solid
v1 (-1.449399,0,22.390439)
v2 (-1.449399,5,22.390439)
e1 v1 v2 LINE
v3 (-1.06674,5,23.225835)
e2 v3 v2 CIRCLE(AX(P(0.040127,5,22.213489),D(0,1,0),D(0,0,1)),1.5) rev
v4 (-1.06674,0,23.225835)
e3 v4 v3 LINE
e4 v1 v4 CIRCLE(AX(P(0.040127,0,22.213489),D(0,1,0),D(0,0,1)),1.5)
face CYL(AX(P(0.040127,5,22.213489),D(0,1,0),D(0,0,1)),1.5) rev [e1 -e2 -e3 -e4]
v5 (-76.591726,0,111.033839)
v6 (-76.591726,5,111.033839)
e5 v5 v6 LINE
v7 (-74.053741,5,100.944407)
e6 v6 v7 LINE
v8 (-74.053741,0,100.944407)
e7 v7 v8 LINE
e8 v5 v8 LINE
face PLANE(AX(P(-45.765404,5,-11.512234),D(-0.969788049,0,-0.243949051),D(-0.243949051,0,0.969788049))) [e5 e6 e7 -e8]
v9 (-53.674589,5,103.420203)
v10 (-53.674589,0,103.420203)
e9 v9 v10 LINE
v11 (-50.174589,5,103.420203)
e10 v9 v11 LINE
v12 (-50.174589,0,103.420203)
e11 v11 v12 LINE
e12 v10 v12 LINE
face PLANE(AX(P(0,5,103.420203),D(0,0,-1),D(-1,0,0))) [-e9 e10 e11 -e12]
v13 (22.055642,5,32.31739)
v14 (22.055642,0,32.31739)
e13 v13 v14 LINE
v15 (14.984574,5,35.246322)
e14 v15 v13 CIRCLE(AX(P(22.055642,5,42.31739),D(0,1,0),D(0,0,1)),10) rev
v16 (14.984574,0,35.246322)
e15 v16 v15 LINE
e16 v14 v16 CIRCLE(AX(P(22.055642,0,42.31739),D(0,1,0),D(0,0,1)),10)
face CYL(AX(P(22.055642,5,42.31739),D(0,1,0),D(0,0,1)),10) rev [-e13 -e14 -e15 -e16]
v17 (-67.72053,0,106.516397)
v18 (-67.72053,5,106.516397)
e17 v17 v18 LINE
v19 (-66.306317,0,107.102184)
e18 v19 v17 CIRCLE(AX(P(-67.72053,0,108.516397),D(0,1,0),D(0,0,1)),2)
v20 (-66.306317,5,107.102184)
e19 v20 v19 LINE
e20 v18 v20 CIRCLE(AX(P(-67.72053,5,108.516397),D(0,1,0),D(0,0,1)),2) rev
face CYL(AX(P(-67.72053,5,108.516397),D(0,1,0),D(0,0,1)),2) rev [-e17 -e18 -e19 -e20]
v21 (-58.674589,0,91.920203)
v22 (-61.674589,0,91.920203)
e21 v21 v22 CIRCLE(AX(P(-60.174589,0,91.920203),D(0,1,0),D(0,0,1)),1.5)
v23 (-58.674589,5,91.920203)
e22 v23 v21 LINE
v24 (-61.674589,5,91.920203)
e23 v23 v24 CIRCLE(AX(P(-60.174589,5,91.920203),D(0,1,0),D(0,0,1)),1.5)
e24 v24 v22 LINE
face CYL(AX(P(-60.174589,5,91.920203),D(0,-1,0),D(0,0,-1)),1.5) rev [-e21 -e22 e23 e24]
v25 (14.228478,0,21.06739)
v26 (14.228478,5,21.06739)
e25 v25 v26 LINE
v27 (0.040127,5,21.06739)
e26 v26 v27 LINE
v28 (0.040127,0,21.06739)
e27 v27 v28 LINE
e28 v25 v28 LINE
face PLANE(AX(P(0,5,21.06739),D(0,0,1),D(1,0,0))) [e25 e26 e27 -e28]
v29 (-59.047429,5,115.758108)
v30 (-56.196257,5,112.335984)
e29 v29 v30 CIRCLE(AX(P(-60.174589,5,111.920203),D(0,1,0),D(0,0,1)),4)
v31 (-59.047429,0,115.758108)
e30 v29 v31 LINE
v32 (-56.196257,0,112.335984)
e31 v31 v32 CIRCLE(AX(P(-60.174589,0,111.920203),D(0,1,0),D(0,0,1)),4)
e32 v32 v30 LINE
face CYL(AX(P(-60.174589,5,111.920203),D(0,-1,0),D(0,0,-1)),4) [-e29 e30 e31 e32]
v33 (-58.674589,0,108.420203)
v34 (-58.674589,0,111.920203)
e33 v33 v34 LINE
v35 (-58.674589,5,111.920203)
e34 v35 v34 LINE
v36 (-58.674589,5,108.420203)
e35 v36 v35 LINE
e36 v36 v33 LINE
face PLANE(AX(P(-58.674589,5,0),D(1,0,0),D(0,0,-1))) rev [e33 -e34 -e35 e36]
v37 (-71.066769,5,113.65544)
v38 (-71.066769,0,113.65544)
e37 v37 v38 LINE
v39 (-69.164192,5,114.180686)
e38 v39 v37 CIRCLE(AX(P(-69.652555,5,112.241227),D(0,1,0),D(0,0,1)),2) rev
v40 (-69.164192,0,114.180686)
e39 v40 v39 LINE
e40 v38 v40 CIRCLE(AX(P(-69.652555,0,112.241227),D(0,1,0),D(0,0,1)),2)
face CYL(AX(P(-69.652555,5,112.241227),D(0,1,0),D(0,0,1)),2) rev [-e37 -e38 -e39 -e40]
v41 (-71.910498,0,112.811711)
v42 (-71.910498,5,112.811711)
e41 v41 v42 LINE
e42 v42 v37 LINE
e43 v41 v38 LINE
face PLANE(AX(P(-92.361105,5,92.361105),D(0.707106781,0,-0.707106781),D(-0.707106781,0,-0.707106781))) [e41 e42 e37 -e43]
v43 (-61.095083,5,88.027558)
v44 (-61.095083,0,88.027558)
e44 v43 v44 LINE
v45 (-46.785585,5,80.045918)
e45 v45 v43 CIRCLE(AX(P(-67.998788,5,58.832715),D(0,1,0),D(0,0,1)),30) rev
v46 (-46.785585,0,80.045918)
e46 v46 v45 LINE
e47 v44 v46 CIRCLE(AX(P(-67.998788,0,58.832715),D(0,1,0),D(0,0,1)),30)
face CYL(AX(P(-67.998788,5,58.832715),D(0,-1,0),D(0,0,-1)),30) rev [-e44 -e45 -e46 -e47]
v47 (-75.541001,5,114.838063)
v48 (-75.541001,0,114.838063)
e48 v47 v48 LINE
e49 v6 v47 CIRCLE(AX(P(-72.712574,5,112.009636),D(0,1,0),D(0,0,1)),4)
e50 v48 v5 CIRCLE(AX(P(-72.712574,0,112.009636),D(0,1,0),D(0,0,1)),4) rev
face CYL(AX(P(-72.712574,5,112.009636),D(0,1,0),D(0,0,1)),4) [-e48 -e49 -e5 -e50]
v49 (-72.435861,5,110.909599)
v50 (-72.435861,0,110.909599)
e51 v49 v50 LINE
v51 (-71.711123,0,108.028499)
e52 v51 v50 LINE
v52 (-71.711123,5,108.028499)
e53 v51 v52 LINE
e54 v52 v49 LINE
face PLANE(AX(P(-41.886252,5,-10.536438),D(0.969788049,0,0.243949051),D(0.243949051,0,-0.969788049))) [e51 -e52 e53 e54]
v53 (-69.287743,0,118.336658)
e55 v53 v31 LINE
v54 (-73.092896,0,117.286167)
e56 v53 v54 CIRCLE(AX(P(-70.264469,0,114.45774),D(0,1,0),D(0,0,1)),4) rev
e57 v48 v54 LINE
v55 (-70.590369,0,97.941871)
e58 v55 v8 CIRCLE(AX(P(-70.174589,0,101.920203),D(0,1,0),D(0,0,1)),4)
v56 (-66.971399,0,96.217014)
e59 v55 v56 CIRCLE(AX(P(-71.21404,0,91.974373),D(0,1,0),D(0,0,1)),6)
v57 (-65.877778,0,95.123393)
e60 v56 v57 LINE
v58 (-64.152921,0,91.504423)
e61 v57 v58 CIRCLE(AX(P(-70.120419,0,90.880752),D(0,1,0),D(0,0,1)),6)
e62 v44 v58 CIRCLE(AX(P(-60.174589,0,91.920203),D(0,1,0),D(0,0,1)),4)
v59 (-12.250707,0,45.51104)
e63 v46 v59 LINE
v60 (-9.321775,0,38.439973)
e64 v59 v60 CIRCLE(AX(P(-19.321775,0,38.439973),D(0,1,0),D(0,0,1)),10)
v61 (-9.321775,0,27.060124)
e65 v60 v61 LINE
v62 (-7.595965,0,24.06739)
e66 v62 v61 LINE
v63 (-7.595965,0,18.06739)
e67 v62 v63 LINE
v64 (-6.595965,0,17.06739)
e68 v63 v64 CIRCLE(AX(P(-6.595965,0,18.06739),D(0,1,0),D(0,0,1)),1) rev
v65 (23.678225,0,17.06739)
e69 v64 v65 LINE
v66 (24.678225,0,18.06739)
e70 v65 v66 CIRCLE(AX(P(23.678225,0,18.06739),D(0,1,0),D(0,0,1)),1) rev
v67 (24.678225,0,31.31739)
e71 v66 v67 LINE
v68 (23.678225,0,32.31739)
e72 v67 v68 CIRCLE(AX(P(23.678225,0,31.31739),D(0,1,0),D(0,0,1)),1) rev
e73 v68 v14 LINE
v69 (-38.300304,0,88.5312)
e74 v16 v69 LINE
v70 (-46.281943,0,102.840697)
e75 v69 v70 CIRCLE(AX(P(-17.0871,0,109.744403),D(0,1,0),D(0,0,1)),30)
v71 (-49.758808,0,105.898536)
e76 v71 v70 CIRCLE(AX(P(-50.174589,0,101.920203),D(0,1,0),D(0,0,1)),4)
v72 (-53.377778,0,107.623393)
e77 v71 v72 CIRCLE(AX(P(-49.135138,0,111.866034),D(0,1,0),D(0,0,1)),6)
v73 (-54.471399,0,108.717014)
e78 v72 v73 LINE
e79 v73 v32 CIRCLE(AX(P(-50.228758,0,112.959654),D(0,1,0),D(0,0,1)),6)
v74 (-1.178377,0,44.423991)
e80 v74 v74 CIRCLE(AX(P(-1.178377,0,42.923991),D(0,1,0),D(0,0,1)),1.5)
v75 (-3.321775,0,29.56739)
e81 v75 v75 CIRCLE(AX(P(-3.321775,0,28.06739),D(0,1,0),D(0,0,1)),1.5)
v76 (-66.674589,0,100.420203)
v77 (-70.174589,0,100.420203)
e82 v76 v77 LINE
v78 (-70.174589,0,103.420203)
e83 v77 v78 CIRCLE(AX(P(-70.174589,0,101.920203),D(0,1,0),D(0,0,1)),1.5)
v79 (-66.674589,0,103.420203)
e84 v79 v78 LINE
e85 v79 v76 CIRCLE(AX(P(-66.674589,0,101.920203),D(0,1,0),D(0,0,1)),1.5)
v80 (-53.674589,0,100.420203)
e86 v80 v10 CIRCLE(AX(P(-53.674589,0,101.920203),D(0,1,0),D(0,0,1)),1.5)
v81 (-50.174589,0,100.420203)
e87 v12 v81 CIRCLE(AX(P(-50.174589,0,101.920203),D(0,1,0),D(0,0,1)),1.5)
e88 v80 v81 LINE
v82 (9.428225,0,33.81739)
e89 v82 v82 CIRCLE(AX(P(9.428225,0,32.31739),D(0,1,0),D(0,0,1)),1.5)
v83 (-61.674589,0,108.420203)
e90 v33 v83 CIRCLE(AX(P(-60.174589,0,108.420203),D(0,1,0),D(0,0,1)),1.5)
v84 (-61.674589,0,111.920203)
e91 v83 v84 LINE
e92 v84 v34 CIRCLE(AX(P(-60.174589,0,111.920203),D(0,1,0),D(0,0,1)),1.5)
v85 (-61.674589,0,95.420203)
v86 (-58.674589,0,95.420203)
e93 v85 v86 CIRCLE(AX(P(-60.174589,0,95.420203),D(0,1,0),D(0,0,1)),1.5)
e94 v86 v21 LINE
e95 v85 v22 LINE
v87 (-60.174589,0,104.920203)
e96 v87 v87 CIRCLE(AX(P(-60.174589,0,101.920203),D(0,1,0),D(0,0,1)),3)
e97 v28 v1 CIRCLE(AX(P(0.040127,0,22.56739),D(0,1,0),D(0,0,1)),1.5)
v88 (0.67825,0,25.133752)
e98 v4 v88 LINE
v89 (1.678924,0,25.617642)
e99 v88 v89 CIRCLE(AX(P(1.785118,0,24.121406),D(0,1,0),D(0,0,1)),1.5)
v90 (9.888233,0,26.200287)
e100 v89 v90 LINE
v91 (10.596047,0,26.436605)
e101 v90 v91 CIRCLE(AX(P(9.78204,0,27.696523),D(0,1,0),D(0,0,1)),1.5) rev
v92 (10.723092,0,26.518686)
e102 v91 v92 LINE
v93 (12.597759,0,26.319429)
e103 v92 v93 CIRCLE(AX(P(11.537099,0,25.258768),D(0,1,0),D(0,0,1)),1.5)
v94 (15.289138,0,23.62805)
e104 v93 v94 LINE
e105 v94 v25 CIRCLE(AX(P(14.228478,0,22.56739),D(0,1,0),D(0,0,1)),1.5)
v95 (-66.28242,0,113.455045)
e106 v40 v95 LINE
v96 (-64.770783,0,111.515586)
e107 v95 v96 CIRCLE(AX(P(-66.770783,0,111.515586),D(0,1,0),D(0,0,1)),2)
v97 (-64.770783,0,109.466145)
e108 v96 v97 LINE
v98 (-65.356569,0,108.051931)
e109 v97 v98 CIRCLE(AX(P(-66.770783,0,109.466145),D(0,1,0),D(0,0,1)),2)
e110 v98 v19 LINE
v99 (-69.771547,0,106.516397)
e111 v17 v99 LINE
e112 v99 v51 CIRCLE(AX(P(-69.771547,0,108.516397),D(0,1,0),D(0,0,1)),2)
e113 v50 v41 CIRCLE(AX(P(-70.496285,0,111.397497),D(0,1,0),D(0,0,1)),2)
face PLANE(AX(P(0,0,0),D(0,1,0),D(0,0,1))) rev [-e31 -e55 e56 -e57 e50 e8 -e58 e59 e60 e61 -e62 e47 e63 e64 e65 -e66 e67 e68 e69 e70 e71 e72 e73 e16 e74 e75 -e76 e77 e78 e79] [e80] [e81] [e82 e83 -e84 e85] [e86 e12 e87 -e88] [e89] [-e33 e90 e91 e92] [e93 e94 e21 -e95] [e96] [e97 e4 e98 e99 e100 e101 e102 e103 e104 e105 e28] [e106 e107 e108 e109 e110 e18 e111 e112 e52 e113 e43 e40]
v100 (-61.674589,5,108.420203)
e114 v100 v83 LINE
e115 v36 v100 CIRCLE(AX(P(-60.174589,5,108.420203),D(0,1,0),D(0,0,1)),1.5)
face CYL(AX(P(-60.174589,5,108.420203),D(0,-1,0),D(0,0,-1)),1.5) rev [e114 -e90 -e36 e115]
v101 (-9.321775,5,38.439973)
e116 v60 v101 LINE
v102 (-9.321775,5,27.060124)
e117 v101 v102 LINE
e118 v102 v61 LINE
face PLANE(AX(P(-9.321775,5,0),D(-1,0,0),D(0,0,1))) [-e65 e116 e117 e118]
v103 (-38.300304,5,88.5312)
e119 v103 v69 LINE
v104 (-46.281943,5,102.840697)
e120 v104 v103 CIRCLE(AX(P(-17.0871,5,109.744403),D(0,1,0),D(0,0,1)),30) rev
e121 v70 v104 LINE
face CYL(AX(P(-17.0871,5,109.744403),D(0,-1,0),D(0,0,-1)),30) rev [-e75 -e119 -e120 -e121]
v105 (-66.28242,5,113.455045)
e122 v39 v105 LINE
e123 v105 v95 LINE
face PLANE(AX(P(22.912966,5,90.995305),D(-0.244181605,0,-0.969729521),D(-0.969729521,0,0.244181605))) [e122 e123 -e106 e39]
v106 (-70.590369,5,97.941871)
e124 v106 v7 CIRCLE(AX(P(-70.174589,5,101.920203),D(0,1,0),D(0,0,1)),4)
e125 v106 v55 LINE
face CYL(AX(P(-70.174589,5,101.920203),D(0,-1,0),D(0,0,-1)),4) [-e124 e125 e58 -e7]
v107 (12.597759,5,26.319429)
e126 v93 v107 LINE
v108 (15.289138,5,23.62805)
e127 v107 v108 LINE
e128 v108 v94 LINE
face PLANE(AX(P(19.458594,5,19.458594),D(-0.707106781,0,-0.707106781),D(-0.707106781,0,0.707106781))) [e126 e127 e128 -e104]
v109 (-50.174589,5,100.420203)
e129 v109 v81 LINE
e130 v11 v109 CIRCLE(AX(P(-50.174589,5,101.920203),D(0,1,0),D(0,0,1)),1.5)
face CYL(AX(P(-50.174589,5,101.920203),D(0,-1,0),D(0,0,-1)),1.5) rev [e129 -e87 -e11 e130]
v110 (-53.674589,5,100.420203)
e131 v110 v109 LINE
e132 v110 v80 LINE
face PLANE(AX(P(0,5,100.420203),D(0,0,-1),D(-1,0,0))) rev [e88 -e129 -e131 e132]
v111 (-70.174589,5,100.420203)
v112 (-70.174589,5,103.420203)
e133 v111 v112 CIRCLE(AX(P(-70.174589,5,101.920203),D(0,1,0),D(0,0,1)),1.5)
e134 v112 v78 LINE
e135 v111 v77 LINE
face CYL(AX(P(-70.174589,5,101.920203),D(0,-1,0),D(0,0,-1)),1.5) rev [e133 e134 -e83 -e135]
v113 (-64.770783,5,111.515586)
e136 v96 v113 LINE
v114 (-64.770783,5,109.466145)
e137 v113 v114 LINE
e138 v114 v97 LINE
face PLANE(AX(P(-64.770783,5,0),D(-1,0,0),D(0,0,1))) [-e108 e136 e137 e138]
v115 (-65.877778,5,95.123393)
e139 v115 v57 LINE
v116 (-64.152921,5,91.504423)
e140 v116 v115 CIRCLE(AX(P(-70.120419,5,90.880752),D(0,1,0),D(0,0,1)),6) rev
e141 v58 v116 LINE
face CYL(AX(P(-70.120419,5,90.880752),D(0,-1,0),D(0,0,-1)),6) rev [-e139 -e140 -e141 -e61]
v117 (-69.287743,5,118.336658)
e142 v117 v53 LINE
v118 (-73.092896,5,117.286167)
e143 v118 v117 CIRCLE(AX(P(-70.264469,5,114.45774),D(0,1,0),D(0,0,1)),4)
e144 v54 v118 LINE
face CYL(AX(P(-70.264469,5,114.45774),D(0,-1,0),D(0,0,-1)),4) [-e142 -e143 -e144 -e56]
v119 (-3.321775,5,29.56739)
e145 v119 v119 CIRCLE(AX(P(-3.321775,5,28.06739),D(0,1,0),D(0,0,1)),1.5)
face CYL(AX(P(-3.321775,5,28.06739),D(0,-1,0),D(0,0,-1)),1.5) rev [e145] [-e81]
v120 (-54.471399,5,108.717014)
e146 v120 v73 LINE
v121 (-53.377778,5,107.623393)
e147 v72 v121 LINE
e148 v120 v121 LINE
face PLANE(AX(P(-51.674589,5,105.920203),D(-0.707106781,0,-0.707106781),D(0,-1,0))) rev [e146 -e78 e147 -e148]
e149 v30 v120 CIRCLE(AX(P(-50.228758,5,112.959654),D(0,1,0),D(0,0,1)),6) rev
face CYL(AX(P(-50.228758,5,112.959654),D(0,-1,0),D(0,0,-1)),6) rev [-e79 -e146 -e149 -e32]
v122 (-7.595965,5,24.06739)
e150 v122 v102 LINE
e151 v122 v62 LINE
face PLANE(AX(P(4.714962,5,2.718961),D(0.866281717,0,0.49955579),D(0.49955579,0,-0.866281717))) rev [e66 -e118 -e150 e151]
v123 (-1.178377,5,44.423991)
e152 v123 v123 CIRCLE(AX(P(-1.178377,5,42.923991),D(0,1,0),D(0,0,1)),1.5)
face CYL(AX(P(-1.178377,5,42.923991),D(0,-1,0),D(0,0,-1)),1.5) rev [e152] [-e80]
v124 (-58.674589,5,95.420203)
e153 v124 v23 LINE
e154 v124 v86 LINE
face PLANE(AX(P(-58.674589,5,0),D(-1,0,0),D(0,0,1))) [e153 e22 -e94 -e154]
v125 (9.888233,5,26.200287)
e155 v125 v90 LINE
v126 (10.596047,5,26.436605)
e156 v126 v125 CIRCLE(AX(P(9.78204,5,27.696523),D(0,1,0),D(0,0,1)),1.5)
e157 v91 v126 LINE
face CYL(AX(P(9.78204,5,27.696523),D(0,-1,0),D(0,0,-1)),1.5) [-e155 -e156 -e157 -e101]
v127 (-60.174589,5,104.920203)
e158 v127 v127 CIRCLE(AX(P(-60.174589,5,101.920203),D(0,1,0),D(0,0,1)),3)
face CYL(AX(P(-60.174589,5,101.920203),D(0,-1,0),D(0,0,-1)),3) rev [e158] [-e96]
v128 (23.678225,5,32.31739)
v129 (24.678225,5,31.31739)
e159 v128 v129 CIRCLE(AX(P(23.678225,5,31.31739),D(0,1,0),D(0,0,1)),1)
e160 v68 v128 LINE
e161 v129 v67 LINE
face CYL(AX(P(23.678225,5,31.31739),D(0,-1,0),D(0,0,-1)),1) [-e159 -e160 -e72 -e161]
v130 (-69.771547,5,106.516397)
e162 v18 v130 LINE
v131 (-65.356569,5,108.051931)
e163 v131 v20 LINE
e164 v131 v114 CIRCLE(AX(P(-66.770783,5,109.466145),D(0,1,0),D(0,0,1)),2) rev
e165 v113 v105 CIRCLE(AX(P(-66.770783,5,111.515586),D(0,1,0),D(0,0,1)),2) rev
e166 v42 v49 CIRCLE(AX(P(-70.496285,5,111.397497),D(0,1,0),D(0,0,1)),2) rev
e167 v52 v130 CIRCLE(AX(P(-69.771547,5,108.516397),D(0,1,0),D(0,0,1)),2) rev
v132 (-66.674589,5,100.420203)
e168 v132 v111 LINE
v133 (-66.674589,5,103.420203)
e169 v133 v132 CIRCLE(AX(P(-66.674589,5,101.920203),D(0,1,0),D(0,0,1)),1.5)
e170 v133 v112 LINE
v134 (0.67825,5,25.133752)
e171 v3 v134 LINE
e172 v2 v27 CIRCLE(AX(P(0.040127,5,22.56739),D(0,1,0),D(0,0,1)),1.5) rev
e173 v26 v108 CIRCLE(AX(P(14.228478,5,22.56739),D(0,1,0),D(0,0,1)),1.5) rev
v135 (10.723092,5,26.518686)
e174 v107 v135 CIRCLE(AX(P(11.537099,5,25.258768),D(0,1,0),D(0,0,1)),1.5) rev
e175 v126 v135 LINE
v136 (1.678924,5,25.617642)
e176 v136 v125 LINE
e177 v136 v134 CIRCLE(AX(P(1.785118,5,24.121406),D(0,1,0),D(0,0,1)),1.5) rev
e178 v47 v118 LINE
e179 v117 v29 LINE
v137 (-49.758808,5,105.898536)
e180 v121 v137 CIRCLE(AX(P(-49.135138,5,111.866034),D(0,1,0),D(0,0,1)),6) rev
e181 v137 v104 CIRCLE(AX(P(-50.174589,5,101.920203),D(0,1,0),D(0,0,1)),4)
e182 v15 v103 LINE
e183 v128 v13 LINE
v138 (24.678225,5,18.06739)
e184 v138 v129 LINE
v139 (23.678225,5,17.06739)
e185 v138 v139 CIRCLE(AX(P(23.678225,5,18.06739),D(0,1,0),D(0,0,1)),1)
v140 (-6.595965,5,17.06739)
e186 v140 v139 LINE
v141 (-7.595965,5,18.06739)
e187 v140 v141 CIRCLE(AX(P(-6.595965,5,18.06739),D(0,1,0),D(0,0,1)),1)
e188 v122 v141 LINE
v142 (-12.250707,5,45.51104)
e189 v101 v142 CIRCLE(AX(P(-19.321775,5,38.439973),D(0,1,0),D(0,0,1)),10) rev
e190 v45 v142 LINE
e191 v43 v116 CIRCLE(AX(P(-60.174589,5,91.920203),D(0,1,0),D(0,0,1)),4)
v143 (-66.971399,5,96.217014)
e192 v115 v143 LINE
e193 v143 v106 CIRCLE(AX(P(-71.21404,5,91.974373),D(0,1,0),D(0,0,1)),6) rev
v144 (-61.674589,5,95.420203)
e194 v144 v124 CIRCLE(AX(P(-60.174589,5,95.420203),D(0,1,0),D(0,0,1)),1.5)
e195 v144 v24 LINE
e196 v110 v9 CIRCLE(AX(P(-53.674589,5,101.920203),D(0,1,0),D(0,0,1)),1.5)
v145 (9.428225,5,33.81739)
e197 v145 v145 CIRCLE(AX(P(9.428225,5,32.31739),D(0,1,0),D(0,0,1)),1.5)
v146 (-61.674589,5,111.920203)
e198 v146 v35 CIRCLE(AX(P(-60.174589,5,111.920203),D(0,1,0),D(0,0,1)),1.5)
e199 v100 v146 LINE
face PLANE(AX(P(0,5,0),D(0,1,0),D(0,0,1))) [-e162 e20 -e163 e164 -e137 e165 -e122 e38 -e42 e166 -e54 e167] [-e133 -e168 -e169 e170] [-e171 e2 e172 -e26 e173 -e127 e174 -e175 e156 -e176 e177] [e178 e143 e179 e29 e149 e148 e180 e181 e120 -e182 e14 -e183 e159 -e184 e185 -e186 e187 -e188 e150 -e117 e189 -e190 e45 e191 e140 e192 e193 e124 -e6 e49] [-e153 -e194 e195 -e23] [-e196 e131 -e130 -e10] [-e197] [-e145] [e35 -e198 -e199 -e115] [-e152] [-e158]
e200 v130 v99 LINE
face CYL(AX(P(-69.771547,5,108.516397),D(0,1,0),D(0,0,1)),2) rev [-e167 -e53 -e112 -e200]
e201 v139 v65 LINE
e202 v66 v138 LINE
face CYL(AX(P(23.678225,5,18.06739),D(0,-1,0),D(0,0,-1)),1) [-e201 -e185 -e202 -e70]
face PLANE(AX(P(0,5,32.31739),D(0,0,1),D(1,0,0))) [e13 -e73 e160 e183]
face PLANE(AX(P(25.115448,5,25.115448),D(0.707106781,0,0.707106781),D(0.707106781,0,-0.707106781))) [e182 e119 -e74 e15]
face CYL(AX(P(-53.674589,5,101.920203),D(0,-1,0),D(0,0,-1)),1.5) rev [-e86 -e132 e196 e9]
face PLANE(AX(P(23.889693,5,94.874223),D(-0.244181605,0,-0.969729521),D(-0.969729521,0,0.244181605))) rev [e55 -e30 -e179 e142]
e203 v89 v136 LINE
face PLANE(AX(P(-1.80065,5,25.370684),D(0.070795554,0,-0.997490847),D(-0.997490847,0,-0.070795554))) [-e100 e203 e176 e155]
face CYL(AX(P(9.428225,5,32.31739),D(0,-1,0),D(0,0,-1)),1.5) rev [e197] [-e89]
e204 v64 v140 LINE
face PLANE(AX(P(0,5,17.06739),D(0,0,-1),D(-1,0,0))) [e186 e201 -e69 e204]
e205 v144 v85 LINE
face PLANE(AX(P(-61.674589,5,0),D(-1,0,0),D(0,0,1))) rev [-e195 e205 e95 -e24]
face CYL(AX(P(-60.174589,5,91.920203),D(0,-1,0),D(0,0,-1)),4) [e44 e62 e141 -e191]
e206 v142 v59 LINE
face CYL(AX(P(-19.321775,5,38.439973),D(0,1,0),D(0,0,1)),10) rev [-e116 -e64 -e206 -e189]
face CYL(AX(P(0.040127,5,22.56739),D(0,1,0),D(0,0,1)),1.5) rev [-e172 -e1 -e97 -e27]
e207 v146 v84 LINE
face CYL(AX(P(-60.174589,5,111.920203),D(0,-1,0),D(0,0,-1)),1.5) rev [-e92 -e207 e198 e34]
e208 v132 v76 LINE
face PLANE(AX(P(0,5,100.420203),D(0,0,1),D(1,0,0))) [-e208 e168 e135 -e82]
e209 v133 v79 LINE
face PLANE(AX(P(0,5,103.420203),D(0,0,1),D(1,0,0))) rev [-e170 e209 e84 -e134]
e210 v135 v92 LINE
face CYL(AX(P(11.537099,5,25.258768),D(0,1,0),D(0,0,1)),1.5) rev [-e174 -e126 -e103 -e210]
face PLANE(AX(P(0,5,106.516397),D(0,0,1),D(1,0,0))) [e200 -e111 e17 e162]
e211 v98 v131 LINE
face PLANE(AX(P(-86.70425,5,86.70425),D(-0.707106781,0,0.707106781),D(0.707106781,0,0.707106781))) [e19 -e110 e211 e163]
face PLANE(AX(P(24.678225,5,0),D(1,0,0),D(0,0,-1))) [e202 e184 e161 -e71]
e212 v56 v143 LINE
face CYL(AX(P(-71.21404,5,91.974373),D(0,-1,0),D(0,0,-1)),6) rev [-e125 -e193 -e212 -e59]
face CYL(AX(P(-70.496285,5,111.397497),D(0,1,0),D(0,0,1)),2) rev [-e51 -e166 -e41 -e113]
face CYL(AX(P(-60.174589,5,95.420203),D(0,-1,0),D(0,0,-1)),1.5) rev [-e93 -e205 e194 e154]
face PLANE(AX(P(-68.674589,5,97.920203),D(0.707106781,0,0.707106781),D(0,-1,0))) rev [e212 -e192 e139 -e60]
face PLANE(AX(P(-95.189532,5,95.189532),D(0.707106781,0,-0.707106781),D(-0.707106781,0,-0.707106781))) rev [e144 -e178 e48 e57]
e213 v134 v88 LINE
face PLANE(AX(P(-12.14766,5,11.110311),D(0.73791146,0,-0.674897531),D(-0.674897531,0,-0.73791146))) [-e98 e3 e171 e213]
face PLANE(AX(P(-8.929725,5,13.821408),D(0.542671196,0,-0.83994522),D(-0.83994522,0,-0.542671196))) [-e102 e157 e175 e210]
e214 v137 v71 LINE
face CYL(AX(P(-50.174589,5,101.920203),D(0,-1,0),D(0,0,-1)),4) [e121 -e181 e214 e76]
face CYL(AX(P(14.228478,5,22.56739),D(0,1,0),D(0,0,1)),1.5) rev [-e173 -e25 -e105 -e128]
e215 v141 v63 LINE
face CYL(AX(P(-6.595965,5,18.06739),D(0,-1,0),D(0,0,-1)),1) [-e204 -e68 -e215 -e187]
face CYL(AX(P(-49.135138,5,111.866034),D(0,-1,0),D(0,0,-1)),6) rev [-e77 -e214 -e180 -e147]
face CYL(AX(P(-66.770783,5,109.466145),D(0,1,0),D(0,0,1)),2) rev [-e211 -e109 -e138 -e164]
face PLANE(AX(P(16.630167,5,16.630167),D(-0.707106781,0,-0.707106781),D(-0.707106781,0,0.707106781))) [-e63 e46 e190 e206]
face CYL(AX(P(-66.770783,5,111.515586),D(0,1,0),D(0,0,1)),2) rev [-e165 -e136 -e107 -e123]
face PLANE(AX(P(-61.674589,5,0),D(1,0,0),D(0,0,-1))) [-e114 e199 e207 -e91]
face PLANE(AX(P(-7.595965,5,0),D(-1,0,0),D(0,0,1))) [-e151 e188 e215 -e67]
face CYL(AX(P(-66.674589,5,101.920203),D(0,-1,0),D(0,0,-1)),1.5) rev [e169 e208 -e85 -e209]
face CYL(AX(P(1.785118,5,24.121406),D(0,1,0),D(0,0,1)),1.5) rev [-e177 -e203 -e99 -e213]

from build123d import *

# Parameters (mm, degrees)
SKETCH2_R           = 3.0000000000000018
SKETCH2_R_2         = 1.4999999999993736
SKETCH2_R_3         = 1.5000000000000009
SKETCH2_R_4         = 1.4999999999993723
BOSS_EXTRUDE1_DEPTH = 5
FILLET1_R           = 1.5
FILLET3_R           = 10
FILLET5_R           = 10
CHAMFER1_SIZE       = 4.5
FILLET6_R           = 6
FILLET7_R           = 4
FILLET8_R           = 2
FILLET9_R           = 30
FILLET10_R          = 1


with BuildPart() as part:
    # Sketch2 → Boss-Extrude1 (new body)
    with BuildSketch(Plane(origin=(0, 0, 0), x_dir=(1, 0, 0), z_dir=(0, 1, 0))):
        with BuildLine():
            Line((-46.189355852298796, -96.42025186017804), (-39.496927389393186, -89.72782339727232))
            Line((-39.496927389393186, -89.72782339727232), (17.913506363615255, -32.31738964426288))
            Line((17.913506363615255, -32.31738964426288), (24.678224989376695, -32.31738964426288))
            Line((24.678224989376695, -32.31738964426288), (24.678224989376428, -17.06738964426295))
            Line((24.678224989376428, -17.06738964426295), (-7.595965049770856, -17.06738964426337))
            Line((-7.595965049770856, -17.06738964426337), (-7.595965049770857, -24.067389644263372))
            Line((-7.595965049770857, -24.067389644263372), (-9.321775010623746, -27.06012368042446))
            Line((-9.321775010623746, -27.06012368042446), (-9.32177501062375, -37.06738964426337))
            Line((-9.32177501062375, -37.06738964426337), (-9.321775010623757, -42.58210827002507))
            Line((-9.321775010623753, -42.58210827002507), (-54.6598701272448, -87.9202033866469))
            Line((-54.6598701272448, -87.9202033866469), (-60.17458875300816, -87.92020338664692))
            ThreePointArc((-60.17458875300816, -87.92020338664692), (-63.00301587775435, -89.09177626190073), (-64.17458875300817, -91.92020338664692))
            Line((-64.17458875300817, -91.92020338664692), (-64.17458875300817, -97.92020338664689))
            Line((-64.17458875300817, -97.92020338664689), (-70.17458875301077, -97.92020338664689))
            ThreePointArc((-70.17458875301077, -97.92020338664689), (-72.6339398041774, -98.76558892412923), (-74.05374095021992, -100.9444071830841))
            Line((-74.05374095021992, -100.9444071830841), (-77.14515150148509, -113.23391188563446))
            Line((-77.14515150148509, -113.23391188563446), (-71.4882972519927, -118.89076613512684))
            Line((-71.4882972519927, -118.89076613512684), (-59.047429208957894, -115.75810794021132))
            ThreePointArc((-59.047429208957894, -115.75810794021132), (-56.9723521770992, -114.3172183869977), (-56.174588753010745, -111.92020338664949))
            Line((-56.174588753010745, -111.92020338664949), (-56.174588753010745, -105.92020338664949))
            Line((-56.174588753010745, -105.92020338664949), (-50.174588753008145, -105.92020338664949))
            ThreePointArc((-50.174588753008145, -105.92020338664949), (-47.34616162826196, -104.74863051139567), (-46.174588753008145, -101.92020338664949))
            Line((-46.174588753008145, -101.92020338664949), (-46.17464642427909, -101.89872393503671))
            Line((-46.17464642427909, -101.89872393503671), (-46.189355852298796, -96.42025186017804))
        make_face()
        Polygon((-70.26446914062754, -114.4577399969996), (-72.71257361922765, -112.00963551839949), (-71.33075600396296, -106.51639746436214), (-66.89210317428027, -106.51639746436214), (-64.77078283072062, -108.63771780792177), (-64.7707828307206, -113.0744087552009), align=None, mode=Mode.SUBTRACT)
        with BuildLine():
            ThreePointArc((-61.67458875301074, -108.42020338664949), (-60.17458875301075, -106.92020338664949), (-58.67458875301077, -108.42020338664949))
            Line((-58.67458875301077, -108.42020338664949), (-58.674588753010774, -111.92020338664949))
            ThreePointArc((-58.674588753010774, -111.92020338664949), (-60.17458875301075, -113.42020338664946), (-61.67458875301073, -111.92020338664949))
            Line((-61.67458875301073, -111.92020338664949), (-61.67458875301074, -108.42020338664949))
        make_face(mode=Mode.SUBTRACT)
        with BuildLine():
            ThreePointArc((-66.67458875301074, -100.42020338664692), (-65.17458875301071, -101.92020338664692), (-66.67458875301074, -103.42020338664692))
            Line((-66.67458875301074, -103.42020338664692), (-70.17458875301077, -103.42020338664692))
            ThreePointArc((-70.17458875301077, -103.42020338664692), (-71.67458875301075, -101.92020338664692), (-70.17458875301077, -100.42020338664692))
            Line((-70.17458875301077, -100.4202033866469), (-66.67458875301074, -100.4202033866469))
        make_face(mode=Mode.SUBTRACT)
        with Locations(Location((-60.174588753008145, -101.92020338664949, 0), (0, 0, 270))):
            Circle(SKETCH2_R, mode=Mode.SUBTRACT)
        with BuildLine():
            ThreePointArc((-53.67458875300815, -103.42020338664949), (-55.17458875300815, -101.92020338664949), (-53.67458875300815, -100.42020338664949))
            Line((-53.67458875300815, -100.42020338664949), (-50.174588753008145, -100.42020338664949))
            ThreePointArc((-50.174588753008145, -100.42020338664949), (-48.67458875300816, -101.92020338664949), (-50.174588753008145, -103.42020338664949))
            Line((-50.174588753008145, -103.42020338664949), (-53.67458875300815, -103.42020338664949))
        make_face(mode=Mode.SUBTRACT)
        with BuildLine():
            ThreePointArc((-58.67458875300815, -95.42020338664692), (-60.17458875300815, -96.9202033866469), (-61.67458875300815, -95.42020338664692))
            Line((-61.674588753008145, -95.42020338664692), (-61.67458875300816, -91.92020338664692))
            ThreePointArc((-61.67458875300816, -91.92020338664692), (-60.174588753008145, -90.42020338664689), (-58.67458875300813, -91.92020338664692))
            Line((-58.67458875300813, -91.92020338664692), (-58.674588753008145, -95.42020338664692))
        make_face(mode=Mode.SUBTRACT)
        with Locations(Location((-1.1783767284213562, -42.92399136206118, 0), (0, 0, 270))):
            Circle(SKETCH2_R_2, mode=Mode.SUBTRACT)
        with Locations(Location((-3.3217750106237407, -28.067389644263372, 0), (0, 0, 270))):
            Circle(SKETCH2_R_3, mode=Mode.SUBTRACT)
        with Locations(Location((9.428224989376764, -32.31738964426288, 0), (0, 0, 270))):
            Circle(SKETCH2_R_4, mode=Mode.SUBTRACT)
        Polygon((1.0820753752795897, -25.575281589539195), (-1.459873180493811, -22.79599601598655), (-1.4598731804937872, -21.06738964426295), (17.849797864630506, -21.06738964426295), (11.740910030340089, -27.17627747855337), (10.272484798754686, -26.22755837455273), align=None, mode=Mode.SUBTRACT)
    extrude(amount=BOSS_EXTRUDE1_DEPTH)

    # Fillet1
    # the kernel refuses this fillet: 1.5 mm, written as the material it adds along each edge
    with BuildSketch(Plane(origin=(1.0820753752795897, 0, 25.575281589539195), x_dir=(0.9974908468725838, 0, 0.07079555357093803), z_dir=(0, 1, 0))) as fillet1_piece_1:
        with BuildLine():
            CenterArc((FILLET1_R * 0.398900109333, FILLET1_R), FILLET1_R, 226.50587582859146, 43.4941241714086)
            Line((-FILLET1_R * 0.289380073746, FILLET1_R * 0.274555040282), (0, 0))
            Line((0, 0), (FILLET1_R * 0.398900109333, 0))
        make_face()
    extrude(amount=5)
    with BuildSketch(Plane(origin=(-1.459873180493811, 0, 22.79599601598655), x_dir=(1.372e-14, 0, -1), z_dir=(0, 1, 0))) as fillet1_piece_2:
        with BuildLine():
            CenterArc((FILLET1_R * 0.388338270451, -FILLET1_R), FILLET1_R, 89.99999999999997, 42.44619337739144)
            Line((-FILLET1_R * 0.286559260205, -FILLET1_R * 0.262088539786), (0, 0))
            Line((0, 0), (FILLET1_R * 0.388338270451, 0))
        make_face()
    extrude(amount=5)
    with BuildSketch(Plane(origin=(-1.459873180493787, 0, 21.06738964426295), x_dir=(1, 0, 0), z_dir=(0, 1, 0))) as fillet1_piece_3:
        with BuildLine():
            CenterArc((FILLET1_R, -FILLET1_R), FILLET1_R, 90, 89.99999999999918)
            Line((-2.087e-14, -FILLET1_R), (0, 0))
            Line((0, 0), (FILLET1_R, 0))
        make_face()
    extrude(amount=5)
    with BuildSketch(Plane(origin=(11.740910030340089, 0, 27.17627747855337), x_dir=(-0.839945220222329, 0, -0.5426711960530642), z_dir=(0, 1, 0))) as fillet1_piece_4:
        with BuildLine():
            CenterArc((FILLET1_R * 0.807844840446, -FILLET1_R), FILLET1_R, 89.99999999999994, 77.86566453571226)
            Line((-FILLET1_R * 0.169812603282, -FILLET1_R * 0.789795521639), (0, 0))
            Line((0, 0), (FILLET1_R * 0.807844840446, -3e-17))
        make_face()
    extrude(amount=5)
    with BuildSketch(Plane(origin=(17.849797864630506, 0, 21.06738964426295), x_dir=(-0.7071067811865475, 0, 0.7071067811865475), z_dir=(0, 1, 0))) as fillet1_piece_5:
        with BuildLine():
            CenterArc((FILLET1_R * 2.41421356237, -FILLET1_R), FILLET1_R, 89.99999999999994, 135.00000000000006)
            Line((FILLET1_R * 1.70710678119, -FILLET1_R * 1.70710678119), (0, 0))
            Line((0, 0), (FILLET1_R * 2.41421356237, 1e-17))
        make_face()
    extrude(amount=5)
    # the kernel refuses this fillet: 1.5 mm, written as the material it takes off along each edge
    with BuildSketch(Plane(origin=(10.27248479875469, -0.9630450228974294, 26.22755837455273), x_dir=(0.8399452202223279, 0, 0.5426711960530661), z_dir=(0, 1, 0))) as fillet1_2_piece_1:
        with BuildLine():
            CenterArc((FILLET1_R * 0.256812006106, -FILLET1_R), FILLET1_R, 90.00000000000006, 28.805982084511456)
            Line((-FILLET1_R * 0.225033157983, -FILLET1_R * 0.123743623222), (0, 0))
            Line((0, 0), (FILLET1_R * 0.256812006106, 2e-17))
        make_face()
    extrude(amount=6.92609004579486, mode=Mode.SUBTRACT)

    # Fillet3
    fillet3_edges = [part.edges().sort_by_distance(p)[0] for p in [
        (17.913506363615255, 2.5, 32.31738964426288),
    ]]
    fillet(fillet3_edges, radius=FILLET3_R)

    # Fillet5
    fillet5_edges = [part.edges().sort_by_distance(p)[0] for p in [
        (-9.321775010623755, 2.5, 42.58210827002507),
    ]]
    fillet(fillet5_edges, radius=FILLET5_R)

    # Chamfer1
    chamfer1_edges = [part.edges().sort_by_distance(p)[0] for p in [
        (-64.17458875300817, 2.5, 97.92020338664689),
        (-56.174588753010745, 2.5, 105.92020338664949),
    ]]
    chamfer(chamfer1_edges, length=CHAMFER1_SIZE)

    # Fillet6
    fillet6_edges = [part.edges().sort_by_distance(p)[0] for p in [
        (-64.17458875300817, 2.5, 93.42020338664689),
        (-68.67458875300817, 2.5, 97.92020338664689),
        (-56.174588753010745, 2.5, 110.42020338664949),
        (-51.674588753010745, 2.5, 105.92020338664949),
    ]]
    fillet(fillet6_edges, radius=FILLET6_R)

    # Fillet7
    fillet7_edges = [part.edges().sort_by_distance(p)[0] for p in [
        (-71.4882972519927, 2.5, 118.89076613512684),
        (-77.14515150148509, 2.5, 113.23391188563446),
    ]]
    fillet(fillet7_edges, radius=FILLET7_R)

    # Fillet8
    fillet8_edges = [part.edges().sort_by_distance(p)[0] for p in [
        (-72.71257361922765, 2.5, 112.00963551839949),
        (-70.26446914062754, 2.5, 114.4577399969996),
        (-64.7707828307206, 2.5, 113.0744087552009),
        (-64.77078283072062, 2.5, 108.63771780792177),
        (-66.89210317428027, 2.5, 106.51639746436214),
        (-71.33075600396296, 2.5, 106.51639746436214),
    ]]
    fillet(fillet8_edges, radius=FILLET8_R)

    # Fillet9
    fillet9_edges = [part.edges().sort_by_distance(p)[0] for p in [
        (-54.6598701272448, 2.5, 87.9202033866469),
        (-46.189355852298796, 2.5, 96.42025186017804),
    ]]
    fillet(fillet9_edges, radius=FILLET9_R)

    # Fillet10
    fillet10_edges = [part.edges().sort_by_distance(p)[0] for p in [
        (-7.595965049770856, 2.5, 17.06738964426337),
        (24.678224989376428, 2.5, 17.06738964426295),
        (24.678224989376695, 2.5, 32.31738964426288),
    ]]
    fillet(fillet10_edges, radius=FILLET10_R)


solid = part.part
